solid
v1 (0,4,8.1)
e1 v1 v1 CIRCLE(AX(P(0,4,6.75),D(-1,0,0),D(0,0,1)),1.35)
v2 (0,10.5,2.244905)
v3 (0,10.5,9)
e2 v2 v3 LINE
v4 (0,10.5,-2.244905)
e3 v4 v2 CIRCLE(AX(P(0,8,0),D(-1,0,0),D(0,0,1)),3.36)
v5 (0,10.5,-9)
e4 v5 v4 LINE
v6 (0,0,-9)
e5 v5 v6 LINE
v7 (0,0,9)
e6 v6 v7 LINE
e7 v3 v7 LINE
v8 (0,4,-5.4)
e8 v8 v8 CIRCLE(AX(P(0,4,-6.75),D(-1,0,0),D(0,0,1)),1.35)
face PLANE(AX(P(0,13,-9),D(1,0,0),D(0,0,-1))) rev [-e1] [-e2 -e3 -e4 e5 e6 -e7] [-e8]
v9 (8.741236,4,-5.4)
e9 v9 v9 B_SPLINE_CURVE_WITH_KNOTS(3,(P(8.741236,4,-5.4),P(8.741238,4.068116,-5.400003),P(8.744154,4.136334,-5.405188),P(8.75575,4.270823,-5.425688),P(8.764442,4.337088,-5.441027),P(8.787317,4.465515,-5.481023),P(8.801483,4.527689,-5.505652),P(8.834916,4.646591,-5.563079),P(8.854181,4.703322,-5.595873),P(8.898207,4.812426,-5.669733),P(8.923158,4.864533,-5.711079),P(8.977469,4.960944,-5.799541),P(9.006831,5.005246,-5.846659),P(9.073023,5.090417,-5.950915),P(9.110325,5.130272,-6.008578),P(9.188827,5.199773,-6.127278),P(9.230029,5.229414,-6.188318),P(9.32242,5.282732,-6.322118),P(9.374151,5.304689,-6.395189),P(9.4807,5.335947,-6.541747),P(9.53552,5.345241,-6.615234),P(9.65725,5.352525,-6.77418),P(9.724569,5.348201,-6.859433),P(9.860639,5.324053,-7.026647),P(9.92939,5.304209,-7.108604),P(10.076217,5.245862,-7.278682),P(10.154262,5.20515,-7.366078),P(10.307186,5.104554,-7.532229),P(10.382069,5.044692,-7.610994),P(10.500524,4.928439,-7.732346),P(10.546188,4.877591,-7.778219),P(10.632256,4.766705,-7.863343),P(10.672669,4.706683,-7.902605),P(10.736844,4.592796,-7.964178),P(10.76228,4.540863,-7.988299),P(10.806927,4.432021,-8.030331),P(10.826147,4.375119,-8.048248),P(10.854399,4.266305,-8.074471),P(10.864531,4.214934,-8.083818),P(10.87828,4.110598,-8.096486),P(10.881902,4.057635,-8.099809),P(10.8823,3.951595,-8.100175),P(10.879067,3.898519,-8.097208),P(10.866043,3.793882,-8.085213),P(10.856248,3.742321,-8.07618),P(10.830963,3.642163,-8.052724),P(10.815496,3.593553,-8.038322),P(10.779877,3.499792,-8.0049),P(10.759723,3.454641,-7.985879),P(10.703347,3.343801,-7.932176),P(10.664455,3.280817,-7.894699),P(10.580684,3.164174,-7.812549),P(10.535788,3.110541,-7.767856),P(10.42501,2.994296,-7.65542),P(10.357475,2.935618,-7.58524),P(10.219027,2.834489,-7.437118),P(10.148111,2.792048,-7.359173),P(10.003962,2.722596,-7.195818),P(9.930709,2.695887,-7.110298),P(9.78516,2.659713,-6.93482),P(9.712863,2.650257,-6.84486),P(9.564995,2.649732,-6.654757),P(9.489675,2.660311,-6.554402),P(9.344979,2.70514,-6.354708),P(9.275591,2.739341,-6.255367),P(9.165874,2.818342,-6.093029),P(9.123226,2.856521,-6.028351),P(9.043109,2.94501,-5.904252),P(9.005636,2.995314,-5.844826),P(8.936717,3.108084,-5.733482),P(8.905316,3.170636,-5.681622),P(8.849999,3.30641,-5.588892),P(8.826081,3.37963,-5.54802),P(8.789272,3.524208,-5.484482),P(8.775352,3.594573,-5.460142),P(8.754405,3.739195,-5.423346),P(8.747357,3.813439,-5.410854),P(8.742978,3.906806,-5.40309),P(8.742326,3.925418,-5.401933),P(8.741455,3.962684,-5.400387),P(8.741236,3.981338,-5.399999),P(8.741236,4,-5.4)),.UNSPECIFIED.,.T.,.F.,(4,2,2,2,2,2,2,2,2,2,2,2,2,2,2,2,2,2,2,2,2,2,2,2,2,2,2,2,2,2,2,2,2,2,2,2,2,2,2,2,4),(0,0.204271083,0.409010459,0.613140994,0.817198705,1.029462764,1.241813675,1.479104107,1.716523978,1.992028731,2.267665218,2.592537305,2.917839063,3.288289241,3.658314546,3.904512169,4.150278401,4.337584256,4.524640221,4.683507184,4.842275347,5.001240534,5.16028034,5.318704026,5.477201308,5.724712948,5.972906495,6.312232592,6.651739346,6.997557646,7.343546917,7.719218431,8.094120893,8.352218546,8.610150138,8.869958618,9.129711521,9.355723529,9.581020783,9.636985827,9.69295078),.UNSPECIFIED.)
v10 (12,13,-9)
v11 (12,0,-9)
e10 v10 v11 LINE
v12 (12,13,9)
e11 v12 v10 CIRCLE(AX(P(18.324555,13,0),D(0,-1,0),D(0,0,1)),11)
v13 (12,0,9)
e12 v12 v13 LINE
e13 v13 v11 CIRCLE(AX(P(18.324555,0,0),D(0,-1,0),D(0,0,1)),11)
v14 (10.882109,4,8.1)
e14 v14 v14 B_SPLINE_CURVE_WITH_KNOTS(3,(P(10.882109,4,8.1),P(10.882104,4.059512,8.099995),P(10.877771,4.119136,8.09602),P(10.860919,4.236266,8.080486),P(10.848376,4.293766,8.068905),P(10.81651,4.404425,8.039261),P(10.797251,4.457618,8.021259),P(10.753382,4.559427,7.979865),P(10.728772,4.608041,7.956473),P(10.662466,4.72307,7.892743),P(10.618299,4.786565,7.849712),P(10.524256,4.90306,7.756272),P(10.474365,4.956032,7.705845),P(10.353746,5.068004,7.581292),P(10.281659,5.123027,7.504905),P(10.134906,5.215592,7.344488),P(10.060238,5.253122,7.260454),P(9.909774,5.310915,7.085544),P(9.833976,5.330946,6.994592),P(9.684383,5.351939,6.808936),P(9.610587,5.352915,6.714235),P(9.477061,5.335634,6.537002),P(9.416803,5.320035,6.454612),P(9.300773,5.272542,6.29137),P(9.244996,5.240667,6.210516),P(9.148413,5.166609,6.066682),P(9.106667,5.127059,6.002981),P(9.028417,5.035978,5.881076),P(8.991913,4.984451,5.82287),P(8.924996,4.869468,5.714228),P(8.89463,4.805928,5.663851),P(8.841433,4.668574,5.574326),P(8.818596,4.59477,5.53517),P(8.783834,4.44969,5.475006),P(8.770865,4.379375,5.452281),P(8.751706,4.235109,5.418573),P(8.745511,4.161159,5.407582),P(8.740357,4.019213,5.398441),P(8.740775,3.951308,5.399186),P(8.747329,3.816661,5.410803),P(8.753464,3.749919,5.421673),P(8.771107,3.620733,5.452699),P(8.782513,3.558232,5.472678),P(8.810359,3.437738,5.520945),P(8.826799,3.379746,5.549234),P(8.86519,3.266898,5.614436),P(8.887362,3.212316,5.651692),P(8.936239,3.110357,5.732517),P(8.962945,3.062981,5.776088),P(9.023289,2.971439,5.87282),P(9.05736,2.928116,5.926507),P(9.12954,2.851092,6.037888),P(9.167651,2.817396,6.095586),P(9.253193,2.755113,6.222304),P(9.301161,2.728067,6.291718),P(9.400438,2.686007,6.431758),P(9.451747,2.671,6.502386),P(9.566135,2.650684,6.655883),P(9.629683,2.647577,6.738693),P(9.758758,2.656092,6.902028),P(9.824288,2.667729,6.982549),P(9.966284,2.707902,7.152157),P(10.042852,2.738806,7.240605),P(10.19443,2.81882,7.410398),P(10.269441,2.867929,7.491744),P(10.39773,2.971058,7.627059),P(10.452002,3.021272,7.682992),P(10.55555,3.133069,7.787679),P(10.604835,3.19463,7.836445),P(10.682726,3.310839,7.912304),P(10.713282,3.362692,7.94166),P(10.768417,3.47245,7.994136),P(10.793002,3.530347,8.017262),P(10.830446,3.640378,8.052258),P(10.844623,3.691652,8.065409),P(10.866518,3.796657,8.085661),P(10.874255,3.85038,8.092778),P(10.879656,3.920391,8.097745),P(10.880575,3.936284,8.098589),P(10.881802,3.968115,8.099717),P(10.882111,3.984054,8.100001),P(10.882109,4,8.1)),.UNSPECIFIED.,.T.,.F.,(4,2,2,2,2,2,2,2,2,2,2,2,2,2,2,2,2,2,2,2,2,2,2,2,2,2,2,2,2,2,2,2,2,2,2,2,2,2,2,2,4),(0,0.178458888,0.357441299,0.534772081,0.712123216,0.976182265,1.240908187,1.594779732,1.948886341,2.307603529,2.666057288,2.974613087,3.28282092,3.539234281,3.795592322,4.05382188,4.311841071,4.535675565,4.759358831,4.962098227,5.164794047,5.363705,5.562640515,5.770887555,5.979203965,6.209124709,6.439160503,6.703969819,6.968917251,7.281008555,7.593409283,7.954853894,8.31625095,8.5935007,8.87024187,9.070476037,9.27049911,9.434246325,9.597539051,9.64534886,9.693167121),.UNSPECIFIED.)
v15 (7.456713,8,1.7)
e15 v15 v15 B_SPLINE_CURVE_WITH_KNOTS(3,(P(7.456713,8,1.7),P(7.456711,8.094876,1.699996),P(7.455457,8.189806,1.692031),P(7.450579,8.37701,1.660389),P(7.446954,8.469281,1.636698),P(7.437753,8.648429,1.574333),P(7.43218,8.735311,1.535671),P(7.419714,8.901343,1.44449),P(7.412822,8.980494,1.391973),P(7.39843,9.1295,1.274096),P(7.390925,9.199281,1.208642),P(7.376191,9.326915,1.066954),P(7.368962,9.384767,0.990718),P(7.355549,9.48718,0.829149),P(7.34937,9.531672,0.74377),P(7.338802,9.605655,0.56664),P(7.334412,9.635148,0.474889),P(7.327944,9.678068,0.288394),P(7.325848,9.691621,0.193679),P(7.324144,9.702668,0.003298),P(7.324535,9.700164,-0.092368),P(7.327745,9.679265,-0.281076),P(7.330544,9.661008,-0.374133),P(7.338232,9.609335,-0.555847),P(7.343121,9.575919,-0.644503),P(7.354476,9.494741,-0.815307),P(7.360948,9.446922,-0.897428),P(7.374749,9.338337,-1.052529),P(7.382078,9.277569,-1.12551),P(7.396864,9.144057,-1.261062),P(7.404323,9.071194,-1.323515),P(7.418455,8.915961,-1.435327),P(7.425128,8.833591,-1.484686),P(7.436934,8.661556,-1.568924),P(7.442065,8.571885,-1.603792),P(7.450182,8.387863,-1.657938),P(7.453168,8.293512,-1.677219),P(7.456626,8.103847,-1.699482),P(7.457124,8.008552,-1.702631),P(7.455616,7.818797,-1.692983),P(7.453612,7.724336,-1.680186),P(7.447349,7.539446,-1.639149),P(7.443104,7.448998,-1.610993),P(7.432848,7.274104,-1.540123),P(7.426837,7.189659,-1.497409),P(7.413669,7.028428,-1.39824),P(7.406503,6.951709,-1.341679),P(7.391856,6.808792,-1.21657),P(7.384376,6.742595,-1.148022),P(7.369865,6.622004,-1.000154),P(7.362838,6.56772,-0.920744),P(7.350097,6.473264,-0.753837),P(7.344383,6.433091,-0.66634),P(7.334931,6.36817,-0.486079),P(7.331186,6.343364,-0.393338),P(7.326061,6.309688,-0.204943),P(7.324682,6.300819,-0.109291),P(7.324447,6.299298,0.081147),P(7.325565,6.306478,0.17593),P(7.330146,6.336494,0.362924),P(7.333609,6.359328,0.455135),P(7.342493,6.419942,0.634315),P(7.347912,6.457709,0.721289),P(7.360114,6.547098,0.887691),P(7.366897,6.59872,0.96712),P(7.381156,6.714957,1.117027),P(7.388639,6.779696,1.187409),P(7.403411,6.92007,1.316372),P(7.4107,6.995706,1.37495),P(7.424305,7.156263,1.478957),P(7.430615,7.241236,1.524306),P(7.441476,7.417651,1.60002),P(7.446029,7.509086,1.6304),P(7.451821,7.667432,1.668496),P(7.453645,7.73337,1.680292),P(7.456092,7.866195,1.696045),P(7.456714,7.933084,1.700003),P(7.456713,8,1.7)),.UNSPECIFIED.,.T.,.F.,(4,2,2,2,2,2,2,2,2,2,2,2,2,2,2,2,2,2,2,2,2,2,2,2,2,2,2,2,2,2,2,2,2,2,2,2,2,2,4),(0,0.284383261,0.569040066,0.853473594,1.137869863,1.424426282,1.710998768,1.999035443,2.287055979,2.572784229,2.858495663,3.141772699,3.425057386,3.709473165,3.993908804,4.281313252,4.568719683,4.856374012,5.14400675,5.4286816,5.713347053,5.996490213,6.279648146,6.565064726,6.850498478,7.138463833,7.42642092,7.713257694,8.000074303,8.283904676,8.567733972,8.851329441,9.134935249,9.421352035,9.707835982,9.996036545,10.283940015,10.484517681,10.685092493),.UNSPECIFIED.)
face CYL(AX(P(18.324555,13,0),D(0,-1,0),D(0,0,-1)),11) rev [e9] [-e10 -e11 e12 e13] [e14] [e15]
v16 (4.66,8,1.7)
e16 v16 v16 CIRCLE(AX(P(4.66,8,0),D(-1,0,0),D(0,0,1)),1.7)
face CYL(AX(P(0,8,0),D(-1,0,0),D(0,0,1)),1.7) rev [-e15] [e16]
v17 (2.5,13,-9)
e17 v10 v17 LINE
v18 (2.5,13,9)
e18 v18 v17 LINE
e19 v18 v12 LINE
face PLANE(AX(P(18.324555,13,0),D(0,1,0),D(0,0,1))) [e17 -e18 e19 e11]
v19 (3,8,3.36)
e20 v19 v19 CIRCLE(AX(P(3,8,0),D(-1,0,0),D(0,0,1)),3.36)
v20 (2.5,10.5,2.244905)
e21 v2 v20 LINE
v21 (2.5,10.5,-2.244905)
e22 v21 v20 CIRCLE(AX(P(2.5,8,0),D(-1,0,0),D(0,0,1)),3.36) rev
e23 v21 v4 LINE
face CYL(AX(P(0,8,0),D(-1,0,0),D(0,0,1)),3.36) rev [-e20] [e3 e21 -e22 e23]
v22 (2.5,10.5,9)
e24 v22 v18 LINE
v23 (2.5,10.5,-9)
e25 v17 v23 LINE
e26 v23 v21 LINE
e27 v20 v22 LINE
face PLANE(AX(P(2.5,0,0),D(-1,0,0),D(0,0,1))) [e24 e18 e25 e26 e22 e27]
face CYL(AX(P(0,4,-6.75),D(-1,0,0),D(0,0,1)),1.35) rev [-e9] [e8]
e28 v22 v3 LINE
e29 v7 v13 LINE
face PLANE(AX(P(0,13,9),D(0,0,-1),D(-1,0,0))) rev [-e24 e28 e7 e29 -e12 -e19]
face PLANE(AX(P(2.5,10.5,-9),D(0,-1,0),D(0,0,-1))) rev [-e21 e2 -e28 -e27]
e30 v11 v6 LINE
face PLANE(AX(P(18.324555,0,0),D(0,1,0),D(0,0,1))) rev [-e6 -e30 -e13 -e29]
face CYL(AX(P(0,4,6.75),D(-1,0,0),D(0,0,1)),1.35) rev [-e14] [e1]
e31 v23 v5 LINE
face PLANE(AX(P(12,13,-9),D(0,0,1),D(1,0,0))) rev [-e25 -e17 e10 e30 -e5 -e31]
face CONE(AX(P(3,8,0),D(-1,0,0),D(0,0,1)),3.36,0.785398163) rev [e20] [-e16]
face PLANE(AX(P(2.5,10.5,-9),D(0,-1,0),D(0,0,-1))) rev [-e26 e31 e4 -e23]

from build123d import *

# Parameters (mm, degrees)
BOSS_EXTRUDE1_DEPTH        = 13
F_2_7_2_7_DIAMETER_HOLE1_D = 2.7
SKETCH15_W                 = 18
SKETCH15_H                 = 2.5
CUT_EXTRUDE1_DEPTH         = 2.5


# Read off the part's stored shape, not the designer's step: CSK for M3 SFHCS1
with BuildPart() as part:
    # Sketch1 → Boss-Extrude1 (new body)
    with BuildSketch(Plane(origin=(0, 0, 0), x_dir=(1, 0, 0), z_dir=(0, 1, 0))):
        with BuildLine():
            Line((0, 9), (0, -9))
            Line((0, -9), (12, -9))
            ThreePointArc((12, -9), (7.32455532, 0), (12, 9))
            Line((12, 9), (0, 9))
        make_face()
    extrude(amount=BOSS_EXTRUDE1_DEPTH)

    # CSK for M3 SFHCS1 outline → CSK for M3 SFHCS1 (revolve, cut)
    with BuildSketch(Plane(origin=(0, 8, 0), x_dir=(0, 1, 0), z_dir=(0, 0, -1))):
        Polygon((1.7, 4.66), (1.7, 7.456784973), (0, 7.456784973), (0, 0), (3.36, 0), (3.36, 3), align=None)
    revolve(axis=Axis((0, 8, 0), (1, 0, 0)), mode=Mode.SUBTRACT)

    # Ø2.7 (2.7) Diameter Hole1 (through all)
    with Locations(Plane.ZY):
        with Locations((-6.75, 4), (6.75, 4)):
            Hole(F_2_7_2_7_DIAMETER_HOLE1_D / 2)

    # Sketch15 → Cut-Extrude1 (cut)
    with BuildSketch(Plane.ZY):
        with Locations((0, 11.75)):
            Rectangle(SKETCH15_W, SKETCH15_H)
    extrude(amount=-CUT_EXTRUDE1_DEPTH, mode=Mode.SUBTRACT)


solid = part.part
